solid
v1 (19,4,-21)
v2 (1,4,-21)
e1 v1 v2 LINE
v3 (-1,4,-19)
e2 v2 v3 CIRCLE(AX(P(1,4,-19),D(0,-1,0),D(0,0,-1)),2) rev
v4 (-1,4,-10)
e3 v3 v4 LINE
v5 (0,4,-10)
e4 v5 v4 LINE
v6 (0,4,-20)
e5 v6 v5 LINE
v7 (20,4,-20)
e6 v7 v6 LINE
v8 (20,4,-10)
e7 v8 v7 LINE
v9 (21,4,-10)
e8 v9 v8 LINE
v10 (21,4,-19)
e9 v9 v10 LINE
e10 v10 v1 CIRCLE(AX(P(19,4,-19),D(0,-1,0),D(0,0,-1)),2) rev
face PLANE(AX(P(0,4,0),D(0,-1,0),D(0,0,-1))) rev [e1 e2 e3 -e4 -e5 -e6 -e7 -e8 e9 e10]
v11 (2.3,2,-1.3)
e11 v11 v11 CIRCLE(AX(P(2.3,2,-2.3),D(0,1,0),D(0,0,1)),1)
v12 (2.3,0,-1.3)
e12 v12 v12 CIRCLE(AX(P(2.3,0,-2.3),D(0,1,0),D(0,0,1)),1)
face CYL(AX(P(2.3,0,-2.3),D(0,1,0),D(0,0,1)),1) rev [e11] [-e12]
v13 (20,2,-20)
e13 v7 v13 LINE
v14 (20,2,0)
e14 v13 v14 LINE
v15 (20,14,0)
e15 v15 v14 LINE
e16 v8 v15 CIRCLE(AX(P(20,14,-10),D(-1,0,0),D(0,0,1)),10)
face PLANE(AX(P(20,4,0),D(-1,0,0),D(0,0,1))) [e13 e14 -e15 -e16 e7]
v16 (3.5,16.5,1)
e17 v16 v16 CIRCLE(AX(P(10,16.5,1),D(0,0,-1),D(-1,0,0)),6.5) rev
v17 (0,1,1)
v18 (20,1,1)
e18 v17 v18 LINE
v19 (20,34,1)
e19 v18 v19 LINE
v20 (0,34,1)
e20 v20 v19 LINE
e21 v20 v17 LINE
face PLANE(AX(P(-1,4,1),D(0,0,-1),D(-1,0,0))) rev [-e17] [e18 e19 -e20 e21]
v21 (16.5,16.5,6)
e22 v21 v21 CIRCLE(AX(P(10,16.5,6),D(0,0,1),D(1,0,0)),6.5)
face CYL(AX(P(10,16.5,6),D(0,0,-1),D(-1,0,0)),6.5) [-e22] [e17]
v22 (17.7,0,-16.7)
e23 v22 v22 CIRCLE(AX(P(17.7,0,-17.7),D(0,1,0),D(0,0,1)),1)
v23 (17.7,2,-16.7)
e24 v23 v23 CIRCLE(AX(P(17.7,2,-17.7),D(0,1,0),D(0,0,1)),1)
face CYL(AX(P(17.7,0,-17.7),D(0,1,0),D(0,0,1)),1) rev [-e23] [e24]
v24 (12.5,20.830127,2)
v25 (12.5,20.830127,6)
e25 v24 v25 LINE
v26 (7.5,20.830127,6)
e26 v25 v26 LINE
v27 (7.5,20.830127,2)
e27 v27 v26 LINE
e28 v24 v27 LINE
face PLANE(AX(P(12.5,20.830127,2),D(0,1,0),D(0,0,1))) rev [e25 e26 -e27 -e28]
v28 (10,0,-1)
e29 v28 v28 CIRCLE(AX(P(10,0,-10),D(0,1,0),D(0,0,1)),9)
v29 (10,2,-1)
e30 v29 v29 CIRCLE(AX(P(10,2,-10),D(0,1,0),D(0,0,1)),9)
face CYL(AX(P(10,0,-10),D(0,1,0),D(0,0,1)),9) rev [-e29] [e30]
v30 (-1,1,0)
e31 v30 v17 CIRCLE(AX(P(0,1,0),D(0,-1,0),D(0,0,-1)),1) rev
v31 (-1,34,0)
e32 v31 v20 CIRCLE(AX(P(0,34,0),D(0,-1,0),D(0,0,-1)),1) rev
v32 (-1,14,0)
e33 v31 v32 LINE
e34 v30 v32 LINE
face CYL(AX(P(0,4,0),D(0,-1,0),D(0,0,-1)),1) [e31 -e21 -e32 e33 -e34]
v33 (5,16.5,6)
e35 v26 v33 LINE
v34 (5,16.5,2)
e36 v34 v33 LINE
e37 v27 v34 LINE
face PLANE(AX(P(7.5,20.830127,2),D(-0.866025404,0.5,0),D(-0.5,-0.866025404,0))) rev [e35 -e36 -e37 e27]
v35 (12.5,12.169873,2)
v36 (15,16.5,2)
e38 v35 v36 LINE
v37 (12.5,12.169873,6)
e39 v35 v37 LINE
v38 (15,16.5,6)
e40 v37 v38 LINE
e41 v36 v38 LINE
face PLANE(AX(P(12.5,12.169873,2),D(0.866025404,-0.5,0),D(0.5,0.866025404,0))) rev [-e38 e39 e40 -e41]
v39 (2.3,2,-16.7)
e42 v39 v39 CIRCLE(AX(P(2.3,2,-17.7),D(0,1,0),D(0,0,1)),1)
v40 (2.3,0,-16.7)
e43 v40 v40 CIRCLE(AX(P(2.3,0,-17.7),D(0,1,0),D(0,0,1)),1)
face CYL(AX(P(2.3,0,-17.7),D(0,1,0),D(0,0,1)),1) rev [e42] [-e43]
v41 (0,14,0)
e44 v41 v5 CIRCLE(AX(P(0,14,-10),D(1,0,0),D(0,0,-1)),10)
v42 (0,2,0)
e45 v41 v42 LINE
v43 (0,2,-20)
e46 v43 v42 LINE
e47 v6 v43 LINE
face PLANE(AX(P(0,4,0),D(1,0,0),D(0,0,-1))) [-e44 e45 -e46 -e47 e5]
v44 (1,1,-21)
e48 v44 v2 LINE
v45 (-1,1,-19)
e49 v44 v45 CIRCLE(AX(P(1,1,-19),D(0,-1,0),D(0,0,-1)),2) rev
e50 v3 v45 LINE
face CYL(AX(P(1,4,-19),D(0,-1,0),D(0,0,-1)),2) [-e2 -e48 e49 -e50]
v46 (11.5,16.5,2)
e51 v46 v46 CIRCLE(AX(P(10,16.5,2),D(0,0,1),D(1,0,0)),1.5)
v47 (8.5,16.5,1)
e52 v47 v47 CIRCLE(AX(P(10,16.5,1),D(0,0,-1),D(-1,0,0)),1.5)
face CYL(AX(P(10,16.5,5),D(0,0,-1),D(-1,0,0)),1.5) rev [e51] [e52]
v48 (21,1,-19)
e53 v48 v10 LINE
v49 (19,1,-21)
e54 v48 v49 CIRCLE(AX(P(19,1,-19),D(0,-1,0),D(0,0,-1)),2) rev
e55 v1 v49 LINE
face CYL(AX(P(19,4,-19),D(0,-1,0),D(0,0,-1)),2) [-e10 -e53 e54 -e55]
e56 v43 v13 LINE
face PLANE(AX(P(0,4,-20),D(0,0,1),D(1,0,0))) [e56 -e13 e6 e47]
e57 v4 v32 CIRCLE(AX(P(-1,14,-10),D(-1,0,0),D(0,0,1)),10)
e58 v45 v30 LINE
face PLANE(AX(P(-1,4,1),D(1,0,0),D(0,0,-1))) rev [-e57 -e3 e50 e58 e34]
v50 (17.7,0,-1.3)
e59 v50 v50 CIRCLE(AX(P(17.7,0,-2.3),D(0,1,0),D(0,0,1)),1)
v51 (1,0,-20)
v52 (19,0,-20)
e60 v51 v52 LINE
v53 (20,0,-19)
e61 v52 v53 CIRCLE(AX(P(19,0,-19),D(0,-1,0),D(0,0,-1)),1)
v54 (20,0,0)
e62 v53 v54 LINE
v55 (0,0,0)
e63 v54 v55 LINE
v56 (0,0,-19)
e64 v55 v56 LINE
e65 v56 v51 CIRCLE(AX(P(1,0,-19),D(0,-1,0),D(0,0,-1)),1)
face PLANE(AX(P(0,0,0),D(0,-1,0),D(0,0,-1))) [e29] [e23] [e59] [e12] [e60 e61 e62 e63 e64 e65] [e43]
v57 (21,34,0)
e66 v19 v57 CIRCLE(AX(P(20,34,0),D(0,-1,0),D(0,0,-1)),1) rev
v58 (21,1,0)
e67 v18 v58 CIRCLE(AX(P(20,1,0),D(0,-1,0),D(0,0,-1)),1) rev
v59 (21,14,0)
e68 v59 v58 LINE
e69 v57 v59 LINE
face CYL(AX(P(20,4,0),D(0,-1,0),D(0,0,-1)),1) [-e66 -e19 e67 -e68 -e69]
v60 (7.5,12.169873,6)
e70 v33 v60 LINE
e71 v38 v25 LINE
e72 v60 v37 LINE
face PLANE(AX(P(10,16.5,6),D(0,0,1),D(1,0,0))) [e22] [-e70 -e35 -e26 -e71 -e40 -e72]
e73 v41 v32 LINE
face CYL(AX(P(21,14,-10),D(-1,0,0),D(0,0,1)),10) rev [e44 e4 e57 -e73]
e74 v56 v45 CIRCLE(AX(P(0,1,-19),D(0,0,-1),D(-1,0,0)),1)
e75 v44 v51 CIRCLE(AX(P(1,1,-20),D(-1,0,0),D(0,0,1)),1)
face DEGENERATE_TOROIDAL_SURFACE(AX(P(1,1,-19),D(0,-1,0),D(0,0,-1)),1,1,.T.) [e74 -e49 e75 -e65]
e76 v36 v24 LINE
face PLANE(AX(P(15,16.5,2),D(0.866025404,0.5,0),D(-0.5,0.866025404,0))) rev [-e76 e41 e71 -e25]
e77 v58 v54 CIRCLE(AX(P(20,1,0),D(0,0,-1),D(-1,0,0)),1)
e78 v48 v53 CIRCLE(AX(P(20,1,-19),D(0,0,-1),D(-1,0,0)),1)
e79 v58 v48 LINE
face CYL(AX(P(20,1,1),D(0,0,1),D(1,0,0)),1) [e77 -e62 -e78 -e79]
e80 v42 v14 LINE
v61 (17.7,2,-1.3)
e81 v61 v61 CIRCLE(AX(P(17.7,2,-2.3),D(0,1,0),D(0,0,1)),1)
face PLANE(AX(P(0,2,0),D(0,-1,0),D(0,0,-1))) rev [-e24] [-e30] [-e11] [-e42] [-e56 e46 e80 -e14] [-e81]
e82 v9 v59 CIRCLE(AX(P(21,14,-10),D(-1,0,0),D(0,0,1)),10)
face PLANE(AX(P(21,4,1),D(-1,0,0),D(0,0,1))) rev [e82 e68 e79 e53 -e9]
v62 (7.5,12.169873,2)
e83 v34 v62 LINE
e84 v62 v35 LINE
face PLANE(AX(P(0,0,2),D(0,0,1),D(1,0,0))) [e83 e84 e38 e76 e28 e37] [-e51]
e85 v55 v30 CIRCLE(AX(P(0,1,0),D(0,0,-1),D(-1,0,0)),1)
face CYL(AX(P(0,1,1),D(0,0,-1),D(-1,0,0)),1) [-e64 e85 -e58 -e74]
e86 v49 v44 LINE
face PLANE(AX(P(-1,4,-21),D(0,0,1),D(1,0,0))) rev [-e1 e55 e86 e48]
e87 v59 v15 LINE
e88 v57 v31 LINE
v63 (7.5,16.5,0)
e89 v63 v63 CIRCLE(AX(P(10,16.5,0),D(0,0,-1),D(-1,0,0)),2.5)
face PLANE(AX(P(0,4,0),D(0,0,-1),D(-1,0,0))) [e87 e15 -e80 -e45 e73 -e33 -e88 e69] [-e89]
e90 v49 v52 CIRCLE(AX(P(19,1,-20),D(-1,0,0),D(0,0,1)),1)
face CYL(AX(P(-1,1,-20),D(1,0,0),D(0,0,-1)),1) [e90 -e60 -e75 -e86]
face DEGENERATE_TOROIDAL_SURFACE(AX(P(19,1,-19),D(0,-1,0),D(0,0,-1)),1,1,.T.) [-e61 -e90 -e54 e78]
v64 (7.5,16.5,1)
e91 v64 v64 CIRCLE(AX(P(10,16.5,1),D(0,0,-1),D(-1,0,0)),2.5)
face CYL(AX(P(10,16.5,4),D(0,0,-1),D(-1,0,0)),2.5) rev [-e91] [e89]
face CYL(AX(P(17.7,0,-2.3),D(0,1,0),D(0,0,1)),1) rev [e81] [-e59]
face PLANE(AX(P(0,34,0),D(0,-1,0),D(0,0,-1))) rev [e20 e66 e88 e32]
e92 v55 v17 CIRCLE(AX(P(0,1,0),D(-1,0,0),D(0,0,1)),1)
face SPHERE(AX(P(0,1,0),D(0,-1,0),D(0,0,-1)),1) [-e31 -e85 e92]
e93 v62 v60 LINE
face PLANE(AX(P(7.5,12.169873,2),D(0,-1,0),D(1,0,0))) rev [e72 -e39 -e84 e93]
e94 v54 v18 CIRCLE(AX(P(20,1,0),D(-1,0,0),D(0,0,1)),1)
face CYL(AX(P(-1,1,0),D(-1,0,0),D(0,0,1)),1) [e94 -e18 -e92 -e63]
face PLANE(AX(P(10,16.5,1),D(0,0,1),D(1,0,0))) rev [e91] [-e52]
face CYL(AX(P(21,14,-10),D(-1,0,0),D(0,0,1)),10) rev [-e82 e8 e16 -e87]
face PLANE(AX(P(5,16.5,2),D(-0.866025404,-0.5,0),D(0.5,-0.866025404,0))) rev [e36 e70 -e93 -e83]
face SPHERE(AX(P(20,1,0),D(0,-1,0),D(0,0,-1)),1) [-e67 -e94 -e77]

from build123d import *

# Parameters (mm, degrees)
SKETCH_1_W          = 22
SKETCH_1_H          = 22
SKETCH_1_W_2        = 20
SKETCH_1_H_2        = 20
EXTRUDE_1_DEPTH     = 4
SKETCH_2_W          = 20
SKETCH_2_H          = 20
EXTRUDE_2_DEPTH     = 2
CUT_EXTRUDE_1_DEPTH = 2
SKETCH_4_R          = 1
CUT_EXTRUDE_2_DEPTH = 2
EXTRUDE_4_DEPTH     = 30
CUT_EXTRUDE_3_DEPTH = 46.617978912
SKETCH_8_R          = 2.5
CUT_EXTRUDE_4_DEPTH = 4
SKETCH_10_R         = 6.5
EXTRUDE_5_DEPTH     = 5
CUT_EXTRUDE_5_DEPTH = 4
SKETCH_12_R         = 1.5
CUT_EXTRUDE_6_DEPTH = 4
FILLET_2_R          = 2
FILLET_3_R          = 2
FILLET_4_R          = 1
FILLET_5_R          = 1
FILLET_6_R          = 1


with BuildPart() as part:
    # 草图1 → 凸台-拉伸1 (new body)
    with BuildSketch(Plane(origin=(0, 0, 0), x_dir=(1, 0, 0), z_dir=(0, 1, 0))):
        with Locations((10, 10)):
            Rectangle(SKETCH_1_W, SKETCH_1_H)
        with Locations((10, 10)):
            Rectangle(SKETCH_1_W_2, SKETCH_1_H_2, mode=Mode.SUBTRACT)
    extrude(amount=EXTRUDE_1_DEPTH)

    # 草图2 → 凸台-拉伸2 (add)
    with BuildSketch(Plane(origin=(0, 0, 0), x_dir=(1, 0, 0), z_dir=(0, 1, 0))):
        with Locations((10, 10)):
            Rectangle(SKETCH_2_W, SKETCH_2_H)
    extrude(amount=EXTRUDE_2_DEPTH)

    # 草图3 → 切除-拉伸1 (cut)
    with BuildSketch(Plane(origin=(0, 2, 0), x_dir=(1, 0, 0), z_dir=(0, 1, 0))):
        with BuildLine():
            ThreePointArc((19, 10), (10, 19), (1, 10))
            Line((1, 10), (19, 10))
        make_face()
        with BuildLine():
            Line((19, 10), (1, 10))
            ThreePointArc((1, 10), (10, 1), (19, 10))
        make_face()
    extrude(amount=-CUT_EXTRUDE_1_DEPTH, mode=Mode.SUBTRACT)

    # 草图4 → 切除-拉伸2 (cut)
    with BuildSketch(Plane(origin=(0, 2, 0), x_dir=(1, 0, 0), z_dir=(0, 1, 0))):
        with Locations(Location((2.3, 17.7, 0), (0, 0, 270))):
            Circle(SKETCH_4_R)
        with Locations(Location((17.7, 17.7, 0), (0, 0, 270))):
            Circle(SKETCH_4_R)
        with Locations(Location((17.7, 2.3, 0), (0, 0, 270))):
            Circle(SKETCH_4_R)
        with Locations(Location((2.3, 2.3, 0), (0, 0, 270))):
            Circle(SKETCH_4_R)
    extrude(amount=-CUT_EXTRUDE_2_DEPTH, mode=Mode.SUBTRACT)

    # 草图5 → 凸台-拉伸4 (add)
    with BuildSketch(Plane(origin=(0, 4, 0), x_dir=(1, 0, 0), z_dir=(0, 1, 0))):
        Polygon((0, 0), (0, 10), (-1, 10), (-1, -1), (21, -1), (21, 10), (20, 10), (20, 0), align=None)
    extrude(amount=EXTRUDE_4_DEPTH)

    # 草图7 → 切除-拉伸3 (cut, through all)
    with BuildSketch(Plane.ZY.offset(1)):
        with BuildLine():
            ThreePointArc((-10, 4), (-2.928932188, 6.928932188), (0, 14))
            Line((0, 14), (-10, 14))
            Line((-10, 14), (-10, 4))
        make_face()
        with BuildLine():
            Line((-10, 14), (0, 14))
            ThreePointArc((0, 14), (-2.928932188, 21.071067812), (-10, 24))
            Line((-10, 24), (-10, 14))
        make_face()
        with BuildLine():
            Line((0, 14), (0, 34))
            Line((0, 34), (-10, 34))
            Line((-10, 34), (-10, 24))
            ThreePointArc((-10, 24), (-2.928932188, 21.071067812), (0, 14))
        make_face()
    extrude(amount=-CUT_EXTRUDE_3_DEPTH, mode=Mode.SUBTRACT)

    # 草图8 → 切除-拉伸4 (cut)
    with BuildSketch(Plane(origin=(0, 0, 0), x_dir=(-1, 0, 0), z_dir=(0, 0, -1))):
        with Locations((-10, 16.5)):
            Circle(SKETCH_8_R)
    extrude(amount=-CUT_EXTRUDE_4_DEPTH, mode=Mode.SUBTRACT)

    # 草图10 → 凸台-拉伸5 (add)
    with BuildSketch(Plane.XY.offset(1)):
        with Locations(Location((10, 16.5, 0), (0, 0, 180))):
            Circle(SKETCH_10_R)
    extrude(amount=EXTRUDE_5_DEPTH)

    # 草图11 → 切除-拉伸5 (cut)
    with BuildSketch(Plane.XY.offset(6)):
        Polygon((15, 16.5), (12.5, 20.830127019), (7.5, 20.830127019), (5, 16.5), (7.5, 12.169872981), (12.5, 12.169872981), align=None)
    extrude(amount=-CUT_EXTRUDE_5_DEPTH, mode=Mode.SUBTRACT)

    # 草图12 → 切除-拉伸6 (cut)
    with BuildSketch(Plane(origin=(0, 0, 1), x_dir=(-1, 0, 0), z_dir=(0, 0, -1))):
        with Locations((-10, 16.5)):
            Circle(SKETCH_12_R)
    extrude(amount=-CUT_EXTRUDE_6_DEPTH, mode=Mode.SUBTRACT)

    # 圆角2
    fillet_2_edges = [part.edges().sort_by_distance(p)[0] for p in [
        (-1, 2, -21),
    ]]
    fillet(fillet_2_edges, radius=FILLET_2_R)

    # 圆角3
    fillet_3_edges = [part.edges().sort_by_distance(p)[0] for p in [
        (21, 2, -21),
    ]]
    fillet(fillet_3_edges, radius=FILLET_3_R)

    # 圆角4
    fillet_4_edges = [part.edges().sort_by_distance(p)[0] for p in [
        (21, 17, 1),
    ]]
    fillet(fillet_4_edges, radius=FILLET_4_R - 0.0001)  # a hair under: the kernel refuses the full size

    # 圆角5
    fillet_5_edges = [part.edges().sort_by_distance(p)[0] for p in [
        (-1, 17, 1),
    ]]
    fillet(fillet_5_edges, radius=FILLET_5_R - 0.0001)  # a hair under: the kernel refuses the full size

    # 圆角6
    fillet_6_edges = [part.edges().sort_by_distance(p)[0] for p in [
        (-1, 0, -9.49995),
        (-0.414213562, 0, -20.414213562),
        (10, 0, -21),
        (20.414213562, 0, -20.414213562),
        (21, 0, -9.49995),
        (20.707136071, 0, 0.707136071),
        (10, 0, 1),
        (-0.707136071, 0, 0.707136071),
    ]]
    fillet(fillet_6_edges, radius=FILLET_6_R - 0.0001)  # a hair under: the kernel refuses the full size


solid = part.part
